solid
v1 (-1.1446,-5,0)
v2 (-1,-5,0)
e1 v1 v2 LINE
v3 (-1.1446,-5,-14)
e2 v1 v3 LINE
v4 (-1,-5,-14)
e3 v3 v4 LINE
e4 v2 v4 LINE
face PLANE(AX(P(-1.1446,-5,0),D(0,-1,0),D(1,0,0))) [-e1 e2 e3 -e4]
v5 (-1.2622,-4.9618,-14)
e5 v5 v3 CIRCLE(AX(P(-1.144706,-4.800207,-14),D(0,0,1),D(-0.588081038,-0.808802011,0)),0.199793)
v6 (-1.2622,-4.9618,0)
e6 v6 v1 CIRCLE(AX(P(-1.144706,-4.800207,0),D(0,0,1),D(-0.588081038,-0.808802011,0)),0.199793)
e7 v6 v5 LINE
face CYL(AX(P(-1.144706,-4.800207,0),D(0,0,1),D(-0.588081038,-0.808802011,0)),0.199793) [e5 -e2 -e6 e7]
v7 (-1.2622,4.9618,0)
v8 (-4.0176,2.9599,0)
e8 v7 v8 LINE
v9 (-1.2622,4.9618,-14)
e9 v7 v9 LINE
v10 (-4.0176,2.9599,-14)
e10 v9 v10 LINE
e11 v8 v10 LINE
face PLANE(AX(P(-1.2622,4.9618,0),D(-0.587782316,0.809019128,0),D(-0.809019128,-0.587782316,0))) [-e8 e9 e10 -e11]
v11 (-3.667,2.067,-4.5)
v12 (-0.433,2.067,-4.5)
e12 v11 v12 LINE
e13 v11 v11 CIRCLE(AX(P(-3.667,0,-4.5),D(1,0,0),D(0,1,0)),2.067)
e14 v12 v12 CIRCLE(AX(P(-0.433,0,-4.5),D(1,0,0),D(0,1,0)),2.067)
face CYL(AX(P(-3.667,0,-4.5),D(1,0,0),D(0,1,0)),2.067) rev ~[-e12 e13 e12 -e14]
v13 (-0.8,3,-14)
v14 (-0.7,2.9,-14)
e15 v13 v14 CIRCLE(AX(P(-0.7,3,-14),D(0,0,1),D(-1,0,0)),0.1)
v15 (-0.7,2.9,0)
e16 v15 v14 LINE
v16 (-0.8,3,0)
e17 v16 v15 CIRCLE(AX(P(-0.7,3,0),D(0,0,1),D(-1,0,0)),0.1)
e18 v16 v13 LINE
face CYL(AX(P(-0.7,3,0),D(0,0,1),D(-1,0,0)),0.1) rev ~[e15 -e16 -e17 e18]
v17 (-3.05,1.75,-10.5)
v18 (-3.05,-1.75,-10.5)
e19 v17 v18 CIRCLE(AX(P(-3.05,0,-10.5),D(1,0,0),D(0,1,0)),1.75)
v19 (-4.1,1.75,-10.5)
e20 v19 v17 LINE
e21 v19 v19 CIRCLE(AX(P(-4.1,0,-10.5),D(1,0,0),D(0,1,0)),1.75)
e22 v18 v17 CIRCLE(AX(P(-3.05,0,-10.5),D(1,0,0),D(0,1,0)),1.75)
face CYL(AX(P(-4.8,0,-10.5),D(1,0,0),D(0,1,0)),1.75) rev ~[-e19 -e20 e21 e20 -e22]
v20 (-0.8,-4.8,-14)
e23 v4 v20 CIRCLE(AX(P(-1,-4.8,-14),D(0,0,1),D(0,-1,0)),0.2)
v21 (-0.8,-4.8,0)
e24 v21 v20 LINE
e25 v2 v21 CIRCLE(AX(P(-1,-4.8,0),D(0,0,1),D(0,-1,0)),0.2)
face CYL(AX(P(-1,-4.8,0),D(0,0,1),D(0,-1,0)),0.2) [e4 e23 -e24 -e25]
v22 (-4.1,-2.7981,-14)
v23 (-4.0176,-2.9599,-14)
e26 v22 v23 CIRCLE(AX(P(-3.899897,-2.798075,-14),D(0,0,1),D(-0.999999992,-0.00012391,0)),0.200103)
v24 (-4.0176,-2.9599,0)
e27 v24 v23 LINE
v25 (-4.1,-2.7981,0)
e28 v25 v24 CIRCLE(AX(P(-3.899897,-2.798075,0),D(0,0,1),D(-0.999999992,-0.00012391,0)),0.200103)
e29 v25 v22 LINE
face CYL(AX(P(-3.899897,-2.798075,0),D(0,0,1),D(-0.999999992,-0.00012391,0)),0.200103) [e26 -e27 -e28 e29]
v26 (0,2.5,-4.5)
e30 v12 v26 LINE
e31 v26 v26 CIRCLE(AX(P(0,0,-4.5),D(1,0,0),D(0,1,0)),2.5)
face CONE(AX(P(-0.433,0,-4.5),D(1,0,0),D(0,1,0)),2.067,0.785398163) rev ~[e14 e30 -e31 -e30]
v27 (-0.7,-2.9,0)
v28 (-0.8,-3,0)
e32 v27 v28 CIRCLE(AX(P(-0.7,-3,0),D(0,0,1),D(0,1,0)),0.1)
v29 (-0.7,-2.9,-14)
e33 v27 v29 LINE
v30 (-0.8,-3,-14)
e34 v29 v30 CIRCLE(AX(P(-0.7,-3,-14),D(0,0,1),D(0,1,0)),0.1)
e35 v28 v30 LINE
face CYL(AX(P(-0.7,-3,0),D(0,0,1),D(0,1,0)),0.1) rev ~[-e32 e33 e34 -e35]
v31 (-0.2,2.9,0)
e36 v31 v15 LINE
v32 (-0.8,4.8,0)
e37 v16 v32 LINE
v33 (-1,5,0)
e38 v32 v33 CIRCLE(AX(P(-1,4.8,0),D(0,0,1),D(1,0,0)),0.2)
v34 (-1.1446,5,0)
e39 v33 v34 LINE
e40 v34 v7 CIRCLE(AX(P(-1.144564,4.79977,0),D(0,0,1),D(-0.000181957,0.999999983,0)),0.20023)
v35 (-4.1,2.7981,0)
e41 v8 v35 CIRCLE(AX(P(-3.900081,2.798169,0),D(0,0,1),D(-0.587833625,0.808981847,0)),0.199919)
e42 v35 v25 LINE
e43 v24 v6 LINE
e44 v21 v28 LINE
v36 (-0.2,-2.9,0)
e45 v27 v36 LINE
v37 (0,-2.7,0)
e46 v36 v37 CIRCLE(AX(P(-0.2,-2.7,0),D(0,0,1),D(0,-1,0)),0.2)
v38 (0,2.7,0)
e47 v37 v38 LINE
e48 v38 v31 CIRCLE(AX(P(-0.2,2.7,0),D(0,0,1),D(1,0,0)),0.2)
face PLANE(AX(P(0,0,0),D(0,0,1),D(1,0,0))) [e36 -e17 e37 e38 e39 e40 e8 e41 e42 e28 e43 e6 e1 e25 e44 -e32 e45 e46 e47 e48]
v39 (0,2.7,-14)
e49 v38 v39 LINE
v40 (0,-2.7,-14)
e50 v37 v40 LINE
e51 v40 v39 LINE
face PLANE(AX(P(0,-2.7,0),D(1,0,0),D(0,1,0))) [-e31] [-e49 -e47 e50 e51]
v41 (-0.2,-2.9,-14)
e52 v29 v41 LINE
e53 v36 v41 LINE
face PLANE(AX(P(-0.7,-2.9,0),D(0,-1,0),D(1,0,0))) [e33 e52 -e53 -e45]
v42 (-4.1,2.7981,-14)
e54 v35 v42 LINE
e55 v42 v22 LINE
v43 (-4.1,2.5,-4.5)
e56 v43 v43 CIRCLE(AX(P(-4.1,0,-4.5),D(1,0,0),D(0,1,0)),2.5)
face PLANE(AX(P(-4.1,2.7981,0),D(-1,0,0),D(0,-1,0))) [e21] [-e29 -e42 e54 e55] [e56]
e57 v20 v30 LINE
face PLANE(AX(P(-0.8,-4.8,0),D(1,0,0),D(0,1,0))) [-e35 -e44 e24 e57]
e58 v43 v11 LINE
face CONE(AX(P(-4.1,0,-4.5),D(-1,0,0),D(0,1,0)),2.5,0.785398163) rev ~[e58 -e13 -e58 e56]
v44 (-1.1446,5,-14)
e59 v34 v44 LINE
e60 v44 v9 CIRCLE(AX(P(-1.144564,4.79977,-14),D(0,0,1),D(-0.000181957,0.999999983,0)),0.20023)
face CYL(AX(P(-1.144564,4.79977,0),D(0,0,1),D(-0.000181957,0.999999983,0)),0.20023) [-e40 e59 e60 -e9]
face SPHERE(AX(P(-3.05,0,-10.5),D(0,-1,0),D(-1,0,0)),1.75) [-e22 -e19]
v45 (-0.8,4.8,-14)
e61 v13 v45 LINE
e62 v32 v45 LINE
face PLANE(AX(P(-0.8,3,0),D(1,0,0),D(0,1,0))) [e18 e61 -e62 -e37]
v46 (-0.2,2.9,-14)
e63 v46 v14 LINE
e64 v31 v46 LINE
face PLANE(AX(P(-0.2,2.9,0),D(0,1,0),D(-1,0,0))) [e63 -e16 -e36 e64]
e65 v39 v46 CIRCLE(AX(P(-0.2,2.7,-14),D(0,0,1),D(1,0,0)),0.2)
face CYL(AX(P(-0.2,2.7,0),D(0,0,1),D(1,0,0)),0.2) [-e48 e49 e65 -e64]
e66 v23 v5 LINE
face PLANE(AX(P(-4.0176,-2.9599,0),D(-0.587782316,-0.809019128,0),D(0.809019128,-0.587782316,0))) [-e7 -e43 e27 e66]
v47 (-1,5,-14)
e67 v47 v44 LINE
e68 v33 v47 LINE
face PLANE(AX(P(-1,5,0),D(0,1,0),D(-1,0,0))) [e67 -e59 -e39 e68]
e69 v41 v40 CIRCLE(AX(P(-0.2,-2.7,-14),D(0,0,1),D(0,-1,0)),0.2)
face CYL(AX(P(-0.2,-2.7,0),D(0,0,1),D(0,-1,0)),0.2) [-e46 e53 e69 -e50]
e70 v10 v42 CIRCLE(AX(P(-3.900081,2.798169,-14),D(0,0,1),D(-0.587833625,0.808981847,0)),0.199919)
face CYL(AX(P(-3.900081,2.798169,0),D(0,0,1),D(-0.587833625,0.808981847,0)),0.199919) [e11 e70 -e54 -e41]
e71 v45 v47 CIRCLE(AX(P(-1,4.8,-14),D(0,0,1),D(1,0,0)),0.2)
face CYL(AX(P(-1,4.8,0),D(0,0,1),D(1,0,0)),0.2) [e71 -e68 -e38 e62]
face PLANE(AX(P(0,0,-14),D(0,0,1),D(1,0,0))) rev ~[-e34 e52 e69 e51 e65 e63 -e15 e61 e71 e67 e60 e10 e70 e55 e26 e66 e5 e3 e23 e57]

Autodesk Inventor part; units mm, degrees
sketch "_____1" plane through (0, 0, 0) normal (0, 0, 1) x (1, 0, 0)
  line L0 (-4.1, 2.7981) -> (-4.1, -2.7981)
  arc A0 (-4.1, -2.7981) -> (-4.0176, -2.9599) centre (-3.9, -2.7981) ccw
  line L1 (-4.0176, -2.9599) -> (-1.2622, -4.9618)
  arc A1 (-1.2622, -4.9618) -> (-1.1446, -5) centre (-1.1446, -4.8) ccw
  line L2 (-1.1446, -5) -> (-1, -5)
  arc A2 (-1, -5) -> (-0.8, -4.8) centre (-1, -4.8) ccw
  line L3 (-0.8, -4.8) -> (-0.8, -3)
  arc A3 (-0.7, -2.9) -> (-0.8, -3) centre (-0.7, -3) ccw
  line L4 (-0.7, -2.9) -> (-0.2, -2.9)
  arc A4 (-0.2, -2.9) -> (0, -2.7) centre (-0.2, -2.7) ccw
  line L5 (0, -2.7) -> (0, 2.7)
  arc A5 (0, 2.7) -> (-0.2, 2.9) centre (-0.2, 2.7) ccw
  line L6 (-0.2, 2.9) -> (-0.7, 2.9)
  arc A6 (-0.8, 3) -> (-0.7, 2.9) centre (-0.7, 3) ccw
  line L7 (-0.8, 3) -> (-0.8, 4.8)
  arc A7 (-0.8, 4.8) -> (-1, 5) centre (-1, 4.8) ccw
  line L8 (-1, 5) -> (-1.1446, 5)
  arc A8 (-1.1446, 5) -> (-1.2622, 4.9618) centre (-1.1446, 4.8) ccw
  line L9 (-1.2622, 4.9618) -> (-4.0176, 2.9599)
  arc A9 (-4.0176, 2.9599) -> (-4.1, 2.7981) centre (-3.9, 2.7981) ccw
extrude "Extrusion1" add sketch "_____1" against normal blind 14
sketch "_____2" plane through (0, 0, -4.5) normal (0, 0, 1) x (1, 0, 0)
  line L0 (0, 0) -> (-4.1, 0)
  line L1 (-4.1, 0) -> (-4.1, 2.5)
  line L2 (-4.1, 2.5) -> (-3.667, 2.067)
  line L3 (-3.667, 2.067) -> (-0.433, 2.067)
  line L4 (-0.433, 2.067) -> (0, 2.5)
  line L5 (0, 2.5) -> (0, 0)
  line L6 (0, 0) -> (-4.1, 0)
revolve "Revolution1" cut sketch "_____2" angle 360 about axis through (0, 0, -4.5) along (1, 0, 0)
thread "Thread1" size "M5x0.8" class "6H" standard "ISO Metric profile" full length
sketch "_____3" plane through (0, 0, -10.5) normal (0, 0, 1) x (1, 0, 0)
  line L0 (-3.05, 0) -> (-4.8, 0)
  line L1 (-4.8, 0) -> (-4.8, 1.75)
  line L2 (-4.8, 1.75) -> (-3.05, 1.75)
  line L3 (-3.05, 1.75) -> (-3.05, 0)
  line L4 (-3.05, 0) -> (-4.8, 0)
revolve "Revolution2" cut sketch "_____3" angle 360 about axis through (-3.05, 0, -10.5) along (1, 0, 0)
sketch "_____4" plane through (0, 0, -10.5) normal (0, 0, 1) x (1, 0, 0)
  line L0 (-3.05, 1.75) -> (-3.05, -1.75)
  arc A0 (-3.05, 1.75) -> (-3.05, -1.75) centre (-3.05, 0) ccw
  line L1 (-3.05, 1.75) -> (-3.05, -1.75)
revolve "Revolution3" add sketch "_____4" angle 360 about axis through (-3.05, 1.75, -10.5) along (0, 1, 0)
ref_plane "to_blackets_XY" through (0, 0, -4.5) normal (1, 0, 0) x (0, 0, -1)
ref_plane "to_blackets_YZ" through (0, 0, -4.5) normal (0, 0, -1) x (0, 1, 0)
ref_plane "to_blackets_ZX" through (0, 0, -4.5) normal (0, 1, 0) x (1, 0, 0)
ref_plane "to_bolt_XY" through (-4.1, 0, -4.5) normal (1, 0, 0) x (0, 0, -1)
ref_plane "to_bolt_YZ" through (-4.1, 0, -4.5) normal (0, 0, -1) x (0, 1, 0)
ref_plane "to_bolt_ZX" through (-4.1, 0, -4.5) normal (0, 1, 0) x (1, 0, 0)
ref_plane "to_frames_XY" through (-0.8, 0, -4.5) normal (1, 0, 0) x (0, 0, -1)
ref_plane "to_frames_YZ" through (-0.8, 0, -4.5) normal (0, 0, -1) x (0, 1, 0)
ref_plane "to_frames_ZX" through (-0.8, 0, -4.5) normal (0, 1, 0) x (1, 0, 0)
properties part number "HNTU5-5" material "ステンレス鋼"
